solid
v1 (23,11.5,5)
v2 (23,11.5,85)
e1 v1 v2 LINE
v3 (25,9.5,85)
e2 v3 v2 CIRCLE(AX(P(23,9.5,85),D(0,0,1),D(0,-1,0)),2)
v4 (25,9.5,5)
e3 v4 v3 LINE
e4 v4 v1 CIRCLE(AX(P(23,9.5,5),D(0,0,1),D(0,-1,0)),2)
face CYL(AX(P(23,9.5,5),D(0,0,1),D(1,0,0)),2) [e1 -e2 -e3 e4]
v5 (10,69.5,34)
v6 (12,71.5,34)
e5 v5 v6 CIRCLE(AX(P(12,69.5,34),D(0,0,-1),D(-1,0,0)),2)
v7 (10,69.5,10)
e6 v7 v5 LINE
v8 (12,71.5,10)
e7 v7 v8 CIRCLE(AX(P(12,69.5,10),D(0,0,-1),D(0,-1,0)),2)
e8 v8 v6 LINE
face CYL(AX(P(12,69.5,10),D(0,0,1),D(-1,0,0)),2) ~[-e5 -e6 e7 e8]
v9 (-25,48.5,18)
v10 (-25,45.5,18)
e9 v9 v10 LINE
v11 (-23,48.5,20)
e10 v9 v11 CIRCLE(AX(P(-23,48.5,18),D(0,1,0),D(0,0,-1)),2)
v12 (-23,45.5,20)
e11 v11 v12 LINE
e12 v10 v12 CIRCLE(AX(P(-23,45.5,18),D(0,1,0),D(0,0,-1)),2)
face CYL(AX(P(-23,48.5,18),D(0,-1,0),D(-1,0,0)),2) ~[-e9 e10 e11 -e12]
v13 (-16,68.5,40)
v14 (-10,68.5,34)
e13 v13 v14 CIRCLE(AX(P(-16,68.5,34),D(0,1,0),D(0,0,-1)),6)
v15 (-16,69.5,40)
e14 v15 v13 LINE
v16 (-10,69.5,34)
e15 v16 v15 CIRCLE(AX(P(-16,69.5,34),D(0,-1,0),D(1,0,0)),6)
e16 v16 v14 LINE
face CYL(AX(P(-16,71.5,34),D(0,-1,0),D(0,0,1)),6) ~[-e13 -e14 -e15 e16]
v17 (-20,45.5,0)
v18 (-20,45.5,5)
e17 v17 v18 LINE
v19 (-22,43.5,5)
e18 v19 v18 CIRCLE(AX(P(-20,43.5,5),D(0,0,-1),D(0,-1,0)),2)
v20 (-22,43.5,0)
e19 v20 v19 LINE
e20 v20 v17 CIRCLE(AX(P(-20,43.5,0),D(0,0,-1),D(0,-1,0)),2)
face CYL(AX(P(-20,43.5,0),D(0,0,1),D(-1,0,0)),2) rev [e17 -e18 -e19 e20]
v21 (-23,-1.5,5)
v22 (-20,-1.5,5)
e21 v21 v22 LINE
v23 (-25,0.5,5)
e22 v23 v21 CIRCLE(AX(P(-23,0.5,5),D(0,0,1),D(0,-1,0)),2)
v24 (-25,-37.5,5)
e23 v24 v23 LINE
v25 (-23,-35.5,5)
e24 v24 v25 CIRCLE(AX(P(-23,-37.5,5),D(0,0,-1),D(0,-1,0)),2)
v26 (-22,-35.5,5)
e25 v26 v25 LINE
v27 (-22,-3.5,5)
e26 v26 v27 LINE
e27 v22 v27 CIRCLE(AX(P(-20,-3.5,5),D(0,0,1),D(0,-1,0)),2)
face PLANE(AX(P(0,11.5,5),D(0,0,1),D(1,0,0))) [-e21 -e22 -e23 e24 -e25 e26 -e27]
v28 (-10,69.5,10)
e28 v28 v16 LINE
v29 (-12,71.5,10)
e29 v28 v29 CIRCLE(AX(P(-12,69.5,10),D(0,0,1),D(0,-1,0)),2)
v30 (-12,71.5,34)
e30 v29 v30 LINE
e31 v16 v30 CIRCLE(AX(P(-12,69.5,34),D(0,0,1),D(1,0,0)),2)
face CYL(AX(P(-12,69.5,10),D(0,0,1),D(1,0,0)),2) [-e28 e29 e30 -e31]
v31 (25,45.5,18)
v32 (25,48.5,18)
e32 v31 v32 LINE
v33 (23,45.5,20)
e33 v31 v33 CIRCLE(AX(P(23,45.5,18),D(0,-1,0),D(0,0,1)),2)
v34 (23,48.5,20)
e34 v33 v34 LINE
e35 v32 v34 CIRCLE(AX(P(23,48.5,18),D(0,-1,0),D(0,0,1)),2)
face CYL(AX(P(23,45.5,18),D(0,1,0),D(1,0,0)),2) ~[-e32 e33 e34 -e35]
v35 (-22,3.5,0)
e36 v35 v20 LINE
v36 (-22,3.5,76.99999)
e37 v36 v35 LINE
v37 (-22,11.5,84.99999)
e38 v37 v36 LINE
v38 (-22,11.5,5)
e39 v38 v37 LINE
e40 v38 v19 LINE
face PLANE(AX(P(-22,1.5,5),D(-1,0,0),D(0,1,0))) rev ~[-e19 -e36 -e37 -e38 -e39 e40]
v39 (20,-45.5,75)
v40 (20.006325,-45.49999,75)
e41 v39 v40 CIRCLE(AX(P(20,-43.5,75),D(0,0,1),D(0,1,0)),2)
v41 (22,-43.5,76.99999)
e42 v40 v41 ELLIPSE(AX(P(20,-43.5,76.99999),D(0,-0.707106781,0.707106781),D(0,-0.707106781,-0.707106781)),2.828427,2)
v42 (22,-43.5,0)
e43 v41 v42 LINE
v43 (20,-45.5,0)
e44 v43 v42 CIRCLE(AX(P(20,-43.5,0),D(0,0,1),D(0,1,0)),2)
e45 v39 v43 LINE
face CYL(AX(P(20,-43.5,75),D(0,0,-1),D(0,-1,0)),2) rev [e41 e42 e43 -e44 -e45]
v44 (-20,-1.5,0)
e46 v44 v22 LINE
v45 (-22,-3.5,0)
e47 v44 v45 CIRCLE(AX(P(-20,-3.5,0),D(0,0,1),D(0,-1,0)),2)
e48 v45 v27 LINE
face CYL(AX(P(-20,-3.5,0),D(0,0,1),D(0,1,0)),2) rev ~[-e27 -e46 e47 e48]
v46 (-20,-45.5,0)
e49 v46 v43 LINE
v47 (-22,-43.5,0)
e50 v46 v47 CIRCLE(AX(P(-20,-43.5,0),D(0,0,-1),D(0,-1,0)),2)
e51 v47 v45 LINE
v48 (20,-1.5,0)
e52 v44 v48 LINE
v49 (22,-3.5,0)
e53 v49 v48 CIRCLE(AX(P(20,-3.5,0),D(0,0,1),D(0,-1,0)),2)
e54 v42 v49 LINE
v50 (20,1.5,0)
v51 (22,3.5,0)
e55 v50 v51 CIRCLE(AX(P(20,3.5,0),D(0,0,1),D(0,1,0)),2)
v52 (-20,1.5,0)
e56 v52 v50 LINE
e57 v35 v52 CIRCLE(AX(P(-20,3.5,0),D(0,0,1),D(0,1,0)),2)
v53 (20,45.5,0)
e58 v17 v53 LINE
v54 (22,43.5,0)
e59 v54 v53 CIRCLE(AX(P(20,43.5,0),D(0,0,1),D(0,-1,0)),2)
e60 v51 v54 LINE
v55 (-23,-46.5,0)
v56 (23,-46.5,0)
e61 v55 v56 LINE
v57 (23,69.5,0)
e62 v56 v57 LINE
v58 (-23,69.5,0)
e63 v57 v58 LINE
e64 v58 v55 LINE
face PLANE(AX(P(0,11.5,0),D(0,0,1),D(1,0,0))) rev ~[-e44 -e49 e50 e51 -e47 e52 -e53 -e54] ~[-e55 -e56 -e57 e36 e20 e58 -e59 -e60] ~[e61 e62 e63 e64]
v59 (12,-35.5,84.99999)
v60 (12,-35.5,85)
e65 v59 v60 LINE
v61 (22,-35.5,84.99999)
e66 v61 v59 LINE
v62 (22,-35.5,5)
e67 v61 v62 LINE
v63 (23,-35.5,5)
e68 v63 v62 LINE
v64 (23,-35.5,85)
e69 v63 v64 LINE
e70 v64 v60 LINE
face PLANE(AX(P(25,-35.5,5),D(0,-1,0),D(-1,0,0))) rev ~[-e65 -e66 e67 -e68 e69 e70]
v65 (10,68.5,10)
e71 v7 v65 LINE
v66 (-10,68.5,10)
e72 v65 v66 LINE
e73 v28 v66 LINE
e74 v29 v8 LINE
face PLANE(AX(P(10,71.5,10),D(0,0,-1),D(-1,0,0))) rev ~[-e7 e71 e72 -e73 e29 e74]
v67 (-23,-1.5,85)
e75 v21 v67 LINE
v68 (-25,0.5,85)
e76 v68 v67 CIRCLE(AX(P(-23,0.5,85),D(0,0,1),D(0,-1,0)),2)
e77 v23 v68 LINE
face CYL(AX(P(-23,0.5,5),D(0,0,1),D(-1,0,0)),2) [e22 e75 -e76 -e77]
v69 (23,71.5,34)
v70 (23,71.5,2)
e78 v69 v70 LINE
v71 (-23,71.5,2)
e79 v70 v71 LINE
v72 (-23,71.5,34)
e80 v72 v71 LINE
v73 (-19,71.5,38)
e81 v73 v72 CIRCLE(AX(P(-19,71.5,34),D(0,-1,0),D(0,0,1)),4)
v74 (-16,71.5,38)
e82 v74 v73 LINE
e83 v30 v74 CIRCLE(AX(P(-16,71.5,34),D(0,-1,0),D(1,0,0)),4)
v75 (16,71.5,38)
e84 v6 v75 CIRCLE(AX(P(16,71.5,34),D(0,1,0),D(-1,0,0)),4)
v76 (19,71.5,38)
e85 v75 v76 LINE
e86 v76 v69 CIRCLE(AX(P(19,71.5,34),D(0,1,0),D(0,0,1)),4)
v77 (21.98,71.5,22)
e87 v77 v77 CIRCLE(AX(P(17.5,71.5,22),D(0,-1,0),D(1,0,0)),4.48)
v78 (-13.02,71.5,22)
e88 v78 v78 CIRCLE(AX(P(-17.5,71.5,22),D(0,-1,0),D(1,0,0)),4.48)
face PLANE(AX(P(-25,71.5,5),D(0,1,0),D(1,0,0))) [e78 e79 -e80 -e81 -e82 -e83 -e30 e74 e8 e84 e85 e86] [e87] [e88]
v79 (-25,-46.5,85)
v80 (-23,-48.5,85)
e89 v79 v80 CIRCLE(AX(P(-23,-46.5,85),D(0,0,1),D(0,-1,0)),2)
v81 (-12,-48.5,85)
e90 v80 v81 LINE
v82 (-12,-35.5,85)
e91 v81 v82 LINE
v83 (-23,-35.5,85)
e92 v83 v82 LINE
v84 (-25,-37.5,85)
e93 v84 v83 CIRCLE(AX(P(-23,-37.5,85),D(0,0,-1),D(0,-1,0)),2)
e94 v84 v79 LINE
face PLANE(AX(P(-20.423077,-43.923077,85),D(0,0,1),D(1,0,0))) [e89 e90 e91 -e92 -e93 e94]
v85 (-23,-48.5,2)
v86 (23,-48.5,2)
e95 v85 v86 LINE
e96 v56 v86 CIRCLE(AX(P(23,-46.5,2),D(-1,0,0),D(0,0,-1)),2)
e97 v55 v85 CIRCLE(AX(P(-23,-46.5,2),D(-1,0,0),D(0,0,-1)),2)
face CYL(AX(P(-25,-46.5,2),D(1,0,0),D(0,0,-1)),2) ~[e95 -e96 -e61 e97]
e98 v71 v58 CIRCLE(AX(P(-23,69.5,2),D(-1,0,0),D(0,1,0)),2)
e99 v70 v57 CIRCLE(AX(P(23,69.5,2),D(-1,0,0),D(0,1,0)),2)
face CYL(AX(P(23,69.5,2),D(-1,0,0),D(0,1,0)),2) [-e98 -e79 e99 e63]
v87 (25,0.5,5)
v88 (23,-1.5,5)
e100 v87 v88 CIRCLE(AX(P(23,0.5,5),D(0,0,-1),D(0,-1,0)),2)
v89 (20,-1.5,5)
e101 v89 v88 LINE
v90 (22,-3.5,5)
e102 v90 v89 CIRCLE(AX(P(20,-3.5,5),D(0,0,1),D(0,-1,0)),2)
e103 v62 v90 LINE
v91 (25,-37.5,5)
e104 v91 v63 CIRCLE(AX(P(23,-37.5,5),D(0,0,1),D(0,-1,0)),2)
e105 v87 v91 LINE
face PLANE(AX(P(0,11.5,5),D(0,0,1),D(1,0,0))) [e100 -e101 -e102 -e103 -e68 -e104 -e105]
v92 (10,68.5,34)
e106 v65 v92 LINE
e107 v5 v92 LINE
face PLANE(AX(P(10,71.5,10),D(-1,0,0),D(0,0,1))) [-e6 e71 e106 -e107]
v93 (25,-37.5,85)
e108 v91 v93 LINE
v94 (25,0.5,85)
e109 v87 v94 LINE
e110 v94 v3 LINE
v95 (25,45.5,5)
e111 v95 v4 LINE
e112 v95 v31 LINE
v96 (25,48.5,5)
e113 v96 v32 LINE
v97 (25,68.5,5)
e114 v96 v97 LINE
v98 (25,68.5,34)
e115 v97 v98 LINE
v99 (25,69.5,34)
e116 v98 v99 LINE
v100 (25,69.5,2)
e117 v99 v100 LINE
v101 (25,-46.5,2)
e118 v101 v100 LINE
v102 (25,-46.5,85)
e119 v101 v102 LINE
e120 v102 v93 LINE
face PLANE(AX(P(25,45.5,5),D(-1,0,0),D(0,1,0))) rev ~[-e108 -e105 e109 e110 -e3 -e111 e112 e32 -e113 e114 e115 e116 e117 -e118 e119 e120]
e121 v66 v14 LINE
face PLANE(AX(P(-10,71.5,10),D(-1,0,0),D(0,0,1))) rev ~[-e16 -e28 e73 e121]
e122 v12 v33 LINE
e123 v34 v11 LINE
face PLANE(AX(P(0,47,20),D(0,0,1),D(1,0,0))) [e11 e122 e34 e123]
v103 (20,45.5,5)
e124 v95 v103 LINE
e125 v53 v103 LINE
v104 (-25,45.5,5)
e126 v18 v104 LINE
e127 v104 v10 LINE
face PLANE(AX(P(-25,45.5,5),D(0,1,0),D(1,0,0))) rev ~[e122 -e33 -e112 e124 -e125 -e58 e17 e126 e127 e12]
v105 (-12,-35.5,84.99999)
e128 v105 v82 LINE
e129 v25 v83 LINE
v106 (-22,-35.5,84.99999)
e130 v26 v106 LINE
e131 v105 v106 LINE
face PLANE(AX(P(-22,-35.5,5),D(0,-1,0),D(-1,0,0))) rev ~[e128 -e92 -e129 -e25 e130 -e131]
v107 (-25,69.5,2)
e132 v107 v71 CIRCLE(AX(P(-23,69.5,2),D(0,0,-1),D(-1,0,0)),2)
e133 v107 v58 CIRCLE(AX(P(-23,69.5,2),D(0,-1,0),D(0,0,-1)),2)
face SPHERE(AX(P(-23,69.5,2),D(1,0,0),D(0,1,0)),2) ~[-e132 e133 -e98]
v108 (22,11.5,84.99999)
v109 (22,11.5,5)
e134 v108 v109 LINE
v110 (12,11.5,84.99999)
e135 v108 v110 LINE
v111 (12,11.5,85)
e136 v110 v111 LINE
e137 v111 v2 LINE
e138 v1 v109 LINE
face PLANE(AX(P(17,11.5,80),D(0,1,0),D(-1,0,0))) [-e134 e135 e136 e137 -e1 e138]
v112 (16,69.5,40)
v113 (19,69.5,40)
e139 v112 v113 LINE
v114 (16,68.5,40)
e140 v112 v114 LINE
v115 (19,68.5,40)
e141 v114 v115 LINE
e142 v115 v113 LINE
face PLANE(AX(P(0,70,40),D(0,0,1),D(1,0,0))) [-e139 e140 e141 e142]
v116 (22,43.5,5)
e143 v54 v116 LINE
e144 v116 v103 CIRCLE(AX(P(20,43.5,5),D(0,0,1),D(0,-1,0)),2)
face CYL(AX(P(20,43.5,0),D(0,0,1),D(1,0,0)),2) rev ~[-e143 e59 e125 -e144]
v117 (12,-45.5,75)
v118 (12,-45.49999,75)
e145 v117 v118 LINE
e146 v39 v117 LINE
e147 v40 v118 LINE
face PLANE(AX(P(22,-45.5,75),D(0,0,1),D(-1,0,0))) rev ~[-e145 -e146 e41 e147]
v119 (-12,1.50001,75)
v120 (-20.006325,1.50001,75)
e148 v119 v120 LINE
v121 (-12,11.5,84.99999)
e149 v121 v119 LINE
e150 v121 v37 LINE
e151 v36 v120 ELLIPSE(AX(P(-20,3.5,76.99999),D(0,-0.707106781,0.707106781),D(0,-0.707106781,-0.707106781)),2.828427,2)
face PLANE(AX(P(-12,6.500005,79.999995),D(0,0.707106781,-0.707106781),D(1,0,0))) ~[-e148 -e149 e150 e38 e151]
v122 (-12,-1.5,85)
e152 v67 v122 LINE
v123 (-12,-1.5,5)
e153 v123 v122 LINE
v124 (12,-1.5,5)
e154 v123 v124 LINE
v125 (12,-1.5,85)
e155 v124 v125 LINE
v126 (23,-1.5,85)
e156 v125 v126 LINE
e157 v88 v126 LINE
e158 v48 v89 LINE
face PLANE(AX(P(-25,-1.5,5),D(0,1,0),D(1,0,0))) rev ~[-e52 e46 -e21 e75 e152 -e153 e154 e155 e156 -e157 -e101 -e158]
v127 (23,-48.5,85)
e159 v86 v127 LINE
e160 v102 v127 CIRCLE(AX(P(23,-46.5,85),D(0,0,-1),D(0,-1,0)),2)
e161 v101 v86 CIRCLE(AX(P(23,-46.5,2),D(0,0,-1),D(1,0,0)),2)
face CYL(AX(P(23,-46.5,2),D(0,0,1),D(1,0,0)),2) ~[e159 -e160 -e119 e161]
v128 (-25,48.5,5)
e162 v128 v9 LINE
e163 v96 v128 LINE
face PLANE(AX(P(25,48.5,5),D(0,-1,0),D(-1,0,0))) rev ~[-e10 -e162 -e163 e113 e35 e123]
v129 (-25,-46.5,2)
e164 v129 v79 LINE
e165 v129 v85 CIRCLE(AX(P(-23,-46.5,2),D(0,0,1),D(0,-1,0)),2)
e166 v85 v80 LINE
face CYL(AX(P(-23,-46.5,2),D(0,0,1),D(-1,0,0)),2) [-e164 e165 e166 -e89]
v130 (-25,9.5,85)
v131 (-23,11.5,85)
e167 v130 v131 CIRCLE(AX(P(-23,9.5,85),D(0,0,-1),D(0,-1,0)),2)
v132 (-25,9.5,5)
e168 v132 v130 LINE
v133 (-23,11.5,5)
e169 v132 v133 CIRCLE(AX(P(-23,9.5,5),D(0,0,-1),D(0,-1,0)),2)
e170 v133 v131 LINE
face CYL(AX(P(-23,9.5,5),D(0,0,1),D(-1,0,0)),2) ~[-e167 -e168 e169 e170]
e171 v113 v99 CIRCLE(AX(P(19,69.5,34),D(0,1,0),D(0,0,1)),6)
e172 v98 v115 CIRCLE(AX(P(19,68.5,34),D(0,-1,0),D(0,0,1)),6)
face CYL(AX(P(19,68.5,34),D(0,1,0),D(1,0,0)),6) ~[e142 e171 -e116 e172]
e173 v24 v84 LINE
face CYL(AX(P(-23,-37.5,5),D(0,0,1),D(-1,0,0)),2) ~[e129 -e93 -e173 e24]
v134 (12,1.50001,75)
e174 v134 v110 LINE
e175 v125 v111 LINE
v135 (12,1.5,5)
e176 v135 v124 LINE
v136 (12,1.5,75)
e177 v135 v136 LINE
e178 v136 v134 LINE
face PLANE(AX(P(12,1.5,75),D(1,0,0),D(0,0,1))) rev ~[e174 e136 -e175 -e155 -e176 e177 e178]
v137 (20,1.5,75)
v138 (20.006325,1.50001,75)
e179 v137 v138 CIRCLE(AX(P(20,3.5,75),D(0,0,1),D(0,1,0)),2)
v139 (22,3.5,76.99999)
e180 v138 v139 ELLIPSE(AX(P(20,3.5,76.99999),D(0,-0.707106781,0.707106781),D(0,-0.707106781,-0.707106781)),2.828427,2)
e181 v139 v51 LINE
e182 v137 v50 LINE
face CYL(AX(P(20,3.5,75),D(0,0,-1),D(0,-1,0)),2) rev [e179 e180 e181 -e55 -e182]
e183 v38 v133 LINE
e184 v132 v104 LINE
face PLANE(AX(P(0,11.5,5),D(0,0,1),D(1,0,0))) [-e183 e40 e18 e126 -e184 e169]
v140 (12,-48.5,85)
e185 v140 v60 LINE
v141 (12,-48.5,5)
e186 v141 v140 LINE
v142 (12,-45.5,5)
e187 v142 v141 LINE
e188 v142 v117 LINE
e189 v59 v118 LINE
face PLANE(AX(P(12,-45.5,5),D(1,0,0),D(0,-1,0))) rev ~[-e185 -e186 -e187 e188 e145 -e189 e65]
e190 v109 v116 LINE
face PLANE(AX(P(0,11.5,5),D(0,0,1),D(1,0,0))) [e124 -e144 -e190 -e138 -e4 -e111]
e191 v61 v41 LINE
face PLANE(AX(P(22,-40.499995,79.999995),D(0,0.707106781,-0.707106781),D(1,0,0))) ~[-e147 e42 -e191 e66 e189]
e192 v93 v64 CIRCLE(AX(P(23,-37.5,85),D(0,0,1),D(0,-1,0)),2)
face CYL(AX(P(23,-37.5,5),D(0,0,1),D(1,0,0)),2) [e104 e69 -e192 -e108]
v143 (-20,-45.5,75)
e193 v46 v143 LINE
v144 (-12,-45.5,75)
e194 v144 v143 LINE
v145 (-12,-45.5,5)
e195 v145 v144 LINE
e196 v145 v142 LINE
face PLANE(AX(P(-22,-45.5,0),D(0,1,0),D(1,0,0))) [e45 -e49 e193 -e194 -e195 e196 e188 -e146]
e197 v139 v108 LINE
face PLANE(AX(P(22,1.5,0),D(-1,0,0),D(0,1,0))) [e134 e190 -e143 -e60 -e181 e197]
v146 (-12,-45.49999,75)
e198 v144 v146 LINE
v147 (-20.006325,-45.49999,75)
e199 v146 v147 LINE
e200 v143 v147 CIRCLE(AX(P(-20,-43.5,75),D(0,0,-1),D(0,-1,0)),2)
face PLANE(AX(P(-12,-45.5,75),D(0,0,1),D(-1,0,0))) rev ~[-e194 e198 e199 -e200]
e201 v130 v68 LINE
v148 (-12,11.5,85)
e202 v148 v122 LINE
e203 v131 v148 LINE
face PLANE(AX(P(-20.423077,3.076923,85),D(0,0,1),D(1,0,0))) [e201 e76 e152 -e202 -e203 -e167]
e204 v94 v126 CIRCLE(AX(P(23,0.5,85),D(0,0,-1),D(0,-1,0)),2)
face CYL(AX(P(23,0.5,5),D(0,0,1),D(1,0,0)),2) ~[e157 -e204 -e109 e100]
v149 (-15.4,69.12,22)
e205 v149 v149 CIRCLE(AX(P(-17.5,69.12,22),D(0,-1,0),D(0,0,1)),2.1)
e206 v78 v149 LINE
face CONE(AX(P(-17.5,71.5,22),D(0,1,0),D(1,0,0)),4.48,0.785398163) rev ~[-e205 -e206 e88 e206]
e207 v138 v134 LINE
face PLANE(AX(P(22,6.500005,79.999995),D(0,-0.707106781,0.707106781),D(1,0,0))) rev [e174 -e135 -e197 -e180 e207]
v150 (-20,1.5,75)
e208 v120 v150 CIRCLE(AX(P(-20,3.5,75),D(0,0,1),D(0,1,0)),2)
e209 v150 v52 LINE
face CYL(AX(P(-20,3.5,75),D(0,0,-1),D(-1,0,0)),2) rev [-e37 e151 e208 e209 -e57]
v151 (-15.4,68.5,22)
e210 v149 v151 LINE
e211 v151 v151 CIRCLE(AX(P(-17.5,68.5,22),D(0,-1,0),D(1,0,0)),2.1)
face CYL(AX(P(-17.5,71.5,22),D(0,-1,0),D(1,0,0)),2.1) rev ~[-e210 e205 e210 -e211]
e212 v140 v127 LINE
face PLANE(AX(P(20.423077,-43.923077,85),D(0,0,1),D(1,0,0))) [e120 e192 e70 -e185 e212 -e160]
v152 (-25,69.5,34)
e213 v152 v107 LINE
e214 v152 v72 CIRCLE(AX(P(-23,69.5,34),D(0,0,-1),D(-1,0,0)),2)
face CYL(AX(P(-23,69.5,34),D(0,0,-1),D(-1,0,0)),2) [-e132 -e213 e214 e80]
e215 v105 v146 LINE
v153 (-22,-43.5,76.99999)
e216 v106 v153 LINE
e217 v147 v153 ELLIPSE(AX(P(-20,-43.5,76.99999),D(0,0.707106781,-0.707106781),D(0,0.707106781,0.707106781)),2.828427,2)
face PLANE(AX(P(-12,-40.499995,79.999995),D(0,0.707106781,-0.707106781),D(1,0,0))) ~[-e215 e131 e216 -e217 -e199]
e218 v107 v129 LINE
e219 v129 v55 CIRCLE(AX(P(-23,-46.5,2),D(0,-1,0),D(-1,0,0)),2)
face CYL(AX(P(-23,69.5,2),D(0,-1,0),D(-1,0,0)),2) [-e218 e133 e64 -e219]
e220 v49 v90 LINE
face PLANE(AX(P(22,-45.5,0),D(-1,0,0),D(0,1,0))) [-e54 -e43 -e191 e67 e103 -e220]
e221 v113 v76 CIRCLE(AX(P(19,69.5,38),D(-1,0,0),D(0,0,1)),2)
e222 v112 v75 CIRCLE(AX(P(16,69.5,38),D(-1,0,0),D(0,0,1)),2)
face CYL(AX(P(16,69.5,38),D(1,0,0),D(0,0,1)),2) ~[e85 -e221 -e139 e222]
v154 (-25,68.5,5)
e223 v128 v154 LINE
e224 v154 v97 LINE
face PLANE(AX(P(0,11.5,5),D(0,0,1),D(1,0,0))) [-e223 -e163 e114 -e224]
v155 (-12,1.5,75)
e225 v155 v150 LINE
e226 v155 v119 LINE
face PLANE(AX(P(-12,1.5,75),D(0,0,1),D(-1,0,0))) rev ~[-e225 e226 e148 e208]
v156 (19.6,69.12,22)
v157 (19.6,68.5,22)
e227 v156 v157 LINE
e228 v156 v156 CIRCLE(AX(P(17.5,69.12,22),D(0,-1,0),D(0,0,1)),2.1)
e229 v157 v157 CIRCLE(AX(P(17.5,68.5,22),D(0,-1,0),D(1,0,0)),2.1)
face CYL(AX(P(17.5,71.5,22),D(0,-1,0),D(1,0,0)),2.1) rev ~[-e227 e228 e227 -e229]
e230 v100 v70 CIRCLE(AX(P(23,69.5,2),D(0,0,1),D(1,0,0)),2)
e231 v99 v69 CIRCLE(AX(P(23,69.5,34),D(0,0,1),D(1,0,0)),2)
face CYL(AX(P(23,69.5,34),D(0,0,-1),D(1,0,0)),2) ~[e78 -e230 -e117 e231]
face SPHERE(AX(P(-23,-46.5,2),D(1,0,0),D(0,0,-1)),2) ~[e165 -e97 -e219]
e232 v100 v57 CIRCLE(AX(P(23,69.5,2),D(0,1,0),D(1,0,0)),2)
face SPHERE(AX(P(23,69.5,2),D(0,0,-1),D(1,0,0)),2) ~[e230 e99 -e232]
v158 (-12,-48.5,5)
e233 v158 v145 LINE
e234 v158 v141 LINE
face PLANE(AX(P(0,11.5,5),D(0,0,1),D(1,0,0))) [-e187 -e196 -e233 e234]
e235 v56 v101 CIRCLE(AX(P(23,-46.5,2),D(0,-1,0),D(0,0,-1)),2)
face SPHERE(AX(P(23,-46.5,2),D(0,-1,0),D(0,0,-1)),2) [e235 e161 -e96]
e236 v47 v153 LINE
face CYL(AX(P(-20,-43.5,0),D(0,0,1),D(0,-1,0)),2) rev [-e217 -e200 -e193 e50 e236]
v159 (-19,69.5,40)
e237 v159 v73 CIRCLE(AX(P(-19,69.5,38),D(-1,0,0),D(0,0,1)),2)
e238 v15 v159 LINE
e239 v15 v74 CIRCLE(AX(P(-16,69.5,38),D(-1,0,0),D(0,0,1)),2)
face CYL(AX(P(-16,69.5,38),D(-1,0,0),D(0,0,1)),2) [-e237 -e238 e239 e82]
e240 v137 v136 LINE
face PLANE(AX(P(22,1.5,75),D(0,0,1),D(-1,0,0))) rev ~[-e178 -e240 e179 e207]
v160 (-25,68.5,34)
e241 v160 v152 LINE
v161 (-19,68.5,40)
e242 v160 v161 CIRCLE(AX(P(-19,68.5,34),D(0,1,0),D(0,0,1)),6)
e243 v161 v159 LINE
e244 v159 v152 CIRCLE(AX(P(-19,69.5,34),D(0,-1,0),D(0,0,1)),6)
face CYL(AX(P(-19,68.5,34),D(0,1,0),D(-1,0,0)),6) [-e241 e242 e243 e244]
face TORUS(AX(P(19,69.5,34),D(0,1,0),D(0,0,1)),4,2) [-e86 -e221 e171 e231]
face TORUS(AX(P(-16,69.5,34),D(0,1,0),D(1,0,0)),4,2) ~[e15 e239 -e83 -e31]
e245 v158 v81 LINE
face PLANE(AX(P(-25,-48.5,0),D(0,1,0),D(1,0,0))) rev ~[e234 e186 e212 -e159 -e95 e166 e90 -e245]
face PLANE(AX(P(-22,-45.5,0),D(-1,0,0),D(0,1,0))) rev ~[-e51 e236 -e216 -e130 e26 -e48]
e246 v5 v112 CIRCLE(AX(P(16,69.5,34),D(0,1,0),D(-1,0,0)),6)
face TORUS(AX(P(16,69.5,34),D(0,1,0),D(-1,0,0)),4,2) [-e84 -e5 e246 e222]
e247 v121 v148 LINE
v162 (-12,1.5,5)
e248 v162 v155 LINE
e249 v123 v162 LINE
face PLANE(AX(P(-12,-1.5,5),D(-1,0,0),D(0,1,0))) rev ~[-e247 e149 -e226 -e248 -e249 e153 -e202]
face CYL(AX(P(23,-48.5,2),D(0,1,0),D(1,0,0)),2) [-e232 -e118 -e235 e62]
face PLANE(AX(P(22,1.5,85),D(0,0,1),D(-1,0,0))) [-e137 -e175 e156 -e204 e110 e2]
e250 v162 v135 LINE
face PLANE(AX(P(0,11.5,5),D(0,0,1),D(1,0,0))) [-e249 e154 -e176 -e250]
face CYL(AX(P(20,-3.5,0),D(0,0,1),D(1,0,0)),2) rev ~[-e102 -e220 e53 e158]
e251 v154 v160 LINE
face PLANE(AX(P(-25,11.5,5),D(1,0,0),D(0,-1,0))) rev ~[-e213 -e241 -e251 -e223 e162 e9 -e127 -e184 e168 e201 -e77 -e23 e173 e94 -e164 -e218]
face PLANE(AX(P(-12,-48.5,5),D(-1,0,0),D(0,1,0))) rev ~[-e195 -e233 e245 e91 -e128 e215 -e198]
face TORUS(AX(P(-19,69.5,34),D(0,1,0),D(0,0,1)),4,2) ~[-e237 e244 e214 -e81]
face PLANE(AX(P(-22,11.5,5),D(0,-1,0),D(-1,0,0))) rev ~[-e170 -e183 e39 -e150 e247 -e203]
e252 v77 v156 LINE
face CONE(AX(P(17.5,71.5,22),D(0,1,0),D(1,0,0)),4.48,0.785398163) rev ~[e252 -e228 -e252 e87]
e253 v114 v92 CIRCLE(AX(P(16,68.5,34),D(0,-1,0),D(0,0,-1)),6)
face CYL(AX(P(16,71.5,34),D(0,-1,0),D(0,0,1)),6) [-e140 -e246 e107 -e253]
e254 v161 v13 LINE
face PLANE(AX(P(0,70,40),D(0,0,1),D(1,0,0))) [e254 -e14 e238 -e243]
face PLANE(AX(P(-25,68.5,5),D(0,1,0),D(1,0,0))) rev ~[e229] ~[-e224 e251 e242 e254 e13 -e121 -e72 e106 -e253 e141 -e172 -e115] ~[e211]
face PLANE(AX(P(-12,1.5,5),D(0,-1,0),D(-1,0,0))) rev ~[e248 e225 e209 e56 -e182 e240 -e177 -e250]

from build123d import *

# Parameters (mm, degrees)
F0_W            = 50
F0_H            = 120
F0_W_2          = 44
F0_H_2          = 44
F1_DEPTH        = 5
F2_W            = 50
F2_H            = 3
F3_DEPTH        = 35
F4_DEPTH        = 15
F5_DEPTH        = 80
F6_W            = 10
F6_H            = 10
F7_W            = 10
F7_H            = 10
F8_DEPTH        = 10
F9_SIZE         = 9.99999
F10_W           = 20
F10_H           = 30
F11_DEPTH       = 3
F12_R           = 6
F13_F1_R        = 2
F13_F2_R        = 2
F13_F3_R        = 2
F13_F4_R        = 2
F13_F5_R        = 2
F13_F6_R        = 2
F13_F7_R        = 2
F13_F8_R        = 2
F13_F9_R        = 2
F13_F10_R       = 2
F13_F11_R       = 2
F13_F12_R       = 2
F13_F13_R       = 2
F13_F14_R       = 2
F13_F15_R       = 2
F13_F16_R       = 2
F13_F17_R       = 2
F13_F18_R       = 2
F13_F19_R       = 2
F13_F20_R       = 2
F15_D           = 4.2
F15_DEPTH       = 12
F15_CSINK_D     = 8.96
F15_CSINK_ANGLE = 90
F15_TIP         = 1.2618073


# Not quite as in the source:
# - a fillet or chamfer is up to 0.001 mm smaller than in the source, because OpenCascade refuses the exact size


with BuildPart() as f1:
    # F0 (on Top) → F1 (new body)
    with BuildSketch(Plane.XY):
        with Locations((0, 11.5)):
            Rectangle(F0_W, F0_H)
        with Locations((0, -23.5)):
            Rectangle(F0_W_2, F0_H_2, mode=Mode.SUBTRACT)
        with Locations((0, 23.5)):
            Rectangle(F0_W_2, F0_H_2, mode=Mode.SUBTRACT)
    extrude(amount=F1_DEPTH)

    # F2 (on face) → F3 (join)
    with BuildSketch(Plane.XY.offset(5)):
        with Locations((0, 70)):
            Rectangle(F2_W, F2_H)
    extrude(amount=F3_DEPTH)

    # F2 (on face) → F4 (join)
    with BuildSketch(Plane.XY.offset(5)):
        Polygon((25, 48.5), (-25, 48.5), (-25, 45.5), (-22, 45.5), (22, 45.5), (25, 45.5), align=None)
    extrude(amount=F4_DEPTH)

    # F2 (on face) → F5 (join)
    with BuildSketch(Plane.XY.offset(5)):
        Polygon((-22, 11.5), (-25, 11.5), (-25, -1.5), (-22, -1.5), (-12, -1.5), (-12, 1.5), (-22, 1.5), align=None)
        Polygon((25, -1.5), (25, 11.5), (22, 11.5), (22, 1.5), (12, 1.5), (12, -1.5), (22, -1.5), align=None)
        Polygon((-22, -35.5), (-25, -35.5), (-25, -48.5), (-12, -48.5), (-12, -45.5), (-22, -45.5), align=None)
        Polygon((25, -48.5), (25, -35.5), (22, -35.5), (22, -45.5), (12, -45.5), (12, -48.5), align=None)
    extrude(amount=F5_DEPTH)

    # F6 (on face) + F7 (on face) → F8 (join)
    with BuildSketch(Plane(origin=(0, 1.5, 0), x_dir=(-1, 0, 0), z_dir=(0, 1, 0))):
        with Locations((-17, 80)):
            Rectangle(F6_W, F6_H)
        with Locations((17, 80)):
            Rectangle(F6_W, F6_H)
    with BuildSketch(Plane(origin=(0, -45.5, 0), x_dir=(-1, 0, 0), z_dir=(0, 1, 0))):
        with Locations((17, 80)):
            Rectangle(F7_W, F7_H)
        with Locations((-17, 80)):
            Rectangle(F7_W, F7_H)
    extrude(amount=F8_DEPTH)

    # F9 (size 10 in the source; OpenCascade refuses exactly that, so slightly less here)
    f9_edges = [f1.edges().sort_by_distance(p)[0] for p in [
        (-17, 11.5, 75),
        (-17, -35.5, 75),
        (17, 11.5, 75),
        (17, -35.5, 75),
    ]]
    chamfer(f9_edges, length=F9_SIZE)

    # F10 (on face) → F11 (cut, through all)
    with BuildSketch(Plane(origin=(0, 71.5, 0), x_dir=(-1, 0, 0), z_dir=(0, 1, 0))):
        with Locations((0, 25)):
            Rectangle(F10_W, F10_H)
    extrude(amount=-F11_DEPTH, mode=Mode.SUBTRACT)

    # F12
    f12_edges = [f1.edges().sort_by_distance(p)[0] for p in [
        (25, 70, 40),
        (10, 70, 40),
        (-10, 70, 40),
        (-25, 70, 40),
    ]]
    fillet(f12_edges, radius=F12_R)

    # F13: fillet of radius 2 on 36 edges, made by hand

    # F13_f1
    f13_f1_edges = [f1.edges().sort_by_distance(p)[0] for p in [
        (25, 71.5, 17),
        (23.2426406871, 71.5, 38.2426406871),
        (17.5, 71.5, 40),
        (11.7573593129, 71.5, 38.2426406871),
        (10, 71.5, 22),
    ]]
    fillet(f13_f1_edges, radius=F13_F1_R)

    # F13_f2
    f13_f2_edges = [f1.edges().sort_by_distance(p)[0] for p in [
        (25, 10.5, 0),
    ]]
    fillet(f13_f2_edges, radius=F13_F2_R)

    # F13_f3
    f13_f3_edges = [f1.edges().sort_by_distance(p)[0] for p in [
        (25, 47, 20),
    ]]
    fillet(f13_f3_edges, radius=F13_F3_R)

    # F13_f4
    f13_f4_edges = [f1.edges().sort_by_distance(p)[0] for p in [
        (25, -48.5, 43.5),
    ]]
    fillet(f13_f4_edges, radius=F13_F4_R)

    # F13_f5
    f13_f5_edges = [f1.edges().sort_by_distance(p)[0] for p in [
        (25, -35.5, 45),
    ]]
    fillet(f13_f5_edges, radius=F13_F5_R)

    # F13_f6
    f13_f6_edges = [f1.edges().sort_by_distance(p)[0] for p in [
        (25, 11.5, 45),
    ]]
    fillet(f13_f6_edges, radius=F13_F6_R)

    # F13_f7
    f13_f7_edges = [f1.edges().sort_by_distance(p)[0] for p in [
        (25, -1.5, 45),
    ]]
    fillet(f13_f7_edges, radius=F13_F7_R)

    # F13_f8
    f13_f8_edges = [f1.edges().sort_by_distance(p)[0] for p in [
        (-25, 71.5, 18),
        (-23.2426406871, 71.5, 38.2426406871),
        (-17.5, 71.5, 40),
        (-11.7573593129, 71.5, 38.2426406871),
        (-10, 71.5, 22),
    ]]
    fillet(f13_f8_edges, radius=F13_F8_R)

    # F13_f9
    f13_f9_edges = [f1.edges().sort_by_distance(p)[0] for p in [
        (-25, -35.5, 45),
    ]]
    fillet(f13_f9_edges, radius=F13_F9_R)

    # F13_f10
    f13_f10_edges = [f1.edges().sort_by_distance(p)[0] for p in [
        (-25, 47, 20),
    ]]
    fillet(f13_f10_edges, radius=F13_F10_R)

    # F13_f11
    f13_f11_edges = [f1.edges().sort_by_distance(p)[0] for p in [
        (-25, -1.5, 45),
    ]]
    fillet(f13_f11_edges, radius=F13_F11_R)

    # F13_f12
    f13_f12_edges = [f1.edges().sort_by_distance(p)[0] for p in [
        (-25, 11.5, 45),
    ]]
    fillet(f13_f12_edges, radius=F13_F12_R)

    # F13_f13
    f13_f13_edges = [f1.edges().sort_by_distance(p)[0] for p in [
        (-22, 45.5, 2.5),
    ]]
    fillet(f13_f13_edges, radius=F13_F13_R)

    # F13_f14
    f13_f14_edges = [f1.edges().sort_by_distance(p)[0] for p in [
        (22, 45.5, 2.5),
    ]]
    fillet(f13_f14_edges, radius=F13_F14_R)

    # F13_f15
    f13_f15_edges = [f1.edges().sort_by_distance(p)[0] for p in [
        (-22, -1.5, 2.5),
    ]]
    fillet(f13_f15_edges, radius=F13_F15_R)

    # F13_f16
    f13_f16_edges = [f1.edges().sort_by_distance(p)[0] for p in [
        (22, -1.5, 2.5),
    ]]
    fillet(f13_f16_edges, radius=F13_F16_R)

    # F13_f17
    f13_f17_edges = [f1.edges().sort_by_distance(p)[0] for p in [
        (-22, -45.5, 37.5),
    ]]
    fillet(f13_f17_edges, radius=F13_F17_R)

    # F13_f18
    f13_f18_edges = [f1.edges().sort_by_distance(p)[0] for p in [
        (22, -45.5, 37.5),
    ]]
    fillet(f13_f18_edges, radius=F13_F18_R)

    # F13_f19
    f13_f19_edges = [f1.edges().sort_by_distance(p)[0] for p in [
        (-22, 1.5, 37.5),
    ]]
    fillet(f13_f19_edges, radius=F13_F19_R)

    # F13_f20
    f13_f20_edges = [f1.edges().sort_by_distance(p)[0] for p in [
        (22, 1.5, 37.5),
    ]]
    fillet(f13_f20_edges, radius=F13_F20_R)

    # F15
    with Locations(Plane(origin=(0, 71.5, 0), x_dir=(-1, 0, 0), z_dir=(0, 1, 0))):
        with Locations((-17.5, 22), (17.5, 22)):
            CounterSinkHole(F15_D / 2, F15_CSINK_D / 2, depth=F15_DEPTH, counter_sink_angle=F15_CSINK_ANGLE)
            with Locations((0, 0, -(F15_DEPTH + F15_TIP / 2))):  # 118° drill point
                Cone(0, F15_D / 2, F15_TIP, mode=Mode.SUBTRACT)


solid = f1.part
